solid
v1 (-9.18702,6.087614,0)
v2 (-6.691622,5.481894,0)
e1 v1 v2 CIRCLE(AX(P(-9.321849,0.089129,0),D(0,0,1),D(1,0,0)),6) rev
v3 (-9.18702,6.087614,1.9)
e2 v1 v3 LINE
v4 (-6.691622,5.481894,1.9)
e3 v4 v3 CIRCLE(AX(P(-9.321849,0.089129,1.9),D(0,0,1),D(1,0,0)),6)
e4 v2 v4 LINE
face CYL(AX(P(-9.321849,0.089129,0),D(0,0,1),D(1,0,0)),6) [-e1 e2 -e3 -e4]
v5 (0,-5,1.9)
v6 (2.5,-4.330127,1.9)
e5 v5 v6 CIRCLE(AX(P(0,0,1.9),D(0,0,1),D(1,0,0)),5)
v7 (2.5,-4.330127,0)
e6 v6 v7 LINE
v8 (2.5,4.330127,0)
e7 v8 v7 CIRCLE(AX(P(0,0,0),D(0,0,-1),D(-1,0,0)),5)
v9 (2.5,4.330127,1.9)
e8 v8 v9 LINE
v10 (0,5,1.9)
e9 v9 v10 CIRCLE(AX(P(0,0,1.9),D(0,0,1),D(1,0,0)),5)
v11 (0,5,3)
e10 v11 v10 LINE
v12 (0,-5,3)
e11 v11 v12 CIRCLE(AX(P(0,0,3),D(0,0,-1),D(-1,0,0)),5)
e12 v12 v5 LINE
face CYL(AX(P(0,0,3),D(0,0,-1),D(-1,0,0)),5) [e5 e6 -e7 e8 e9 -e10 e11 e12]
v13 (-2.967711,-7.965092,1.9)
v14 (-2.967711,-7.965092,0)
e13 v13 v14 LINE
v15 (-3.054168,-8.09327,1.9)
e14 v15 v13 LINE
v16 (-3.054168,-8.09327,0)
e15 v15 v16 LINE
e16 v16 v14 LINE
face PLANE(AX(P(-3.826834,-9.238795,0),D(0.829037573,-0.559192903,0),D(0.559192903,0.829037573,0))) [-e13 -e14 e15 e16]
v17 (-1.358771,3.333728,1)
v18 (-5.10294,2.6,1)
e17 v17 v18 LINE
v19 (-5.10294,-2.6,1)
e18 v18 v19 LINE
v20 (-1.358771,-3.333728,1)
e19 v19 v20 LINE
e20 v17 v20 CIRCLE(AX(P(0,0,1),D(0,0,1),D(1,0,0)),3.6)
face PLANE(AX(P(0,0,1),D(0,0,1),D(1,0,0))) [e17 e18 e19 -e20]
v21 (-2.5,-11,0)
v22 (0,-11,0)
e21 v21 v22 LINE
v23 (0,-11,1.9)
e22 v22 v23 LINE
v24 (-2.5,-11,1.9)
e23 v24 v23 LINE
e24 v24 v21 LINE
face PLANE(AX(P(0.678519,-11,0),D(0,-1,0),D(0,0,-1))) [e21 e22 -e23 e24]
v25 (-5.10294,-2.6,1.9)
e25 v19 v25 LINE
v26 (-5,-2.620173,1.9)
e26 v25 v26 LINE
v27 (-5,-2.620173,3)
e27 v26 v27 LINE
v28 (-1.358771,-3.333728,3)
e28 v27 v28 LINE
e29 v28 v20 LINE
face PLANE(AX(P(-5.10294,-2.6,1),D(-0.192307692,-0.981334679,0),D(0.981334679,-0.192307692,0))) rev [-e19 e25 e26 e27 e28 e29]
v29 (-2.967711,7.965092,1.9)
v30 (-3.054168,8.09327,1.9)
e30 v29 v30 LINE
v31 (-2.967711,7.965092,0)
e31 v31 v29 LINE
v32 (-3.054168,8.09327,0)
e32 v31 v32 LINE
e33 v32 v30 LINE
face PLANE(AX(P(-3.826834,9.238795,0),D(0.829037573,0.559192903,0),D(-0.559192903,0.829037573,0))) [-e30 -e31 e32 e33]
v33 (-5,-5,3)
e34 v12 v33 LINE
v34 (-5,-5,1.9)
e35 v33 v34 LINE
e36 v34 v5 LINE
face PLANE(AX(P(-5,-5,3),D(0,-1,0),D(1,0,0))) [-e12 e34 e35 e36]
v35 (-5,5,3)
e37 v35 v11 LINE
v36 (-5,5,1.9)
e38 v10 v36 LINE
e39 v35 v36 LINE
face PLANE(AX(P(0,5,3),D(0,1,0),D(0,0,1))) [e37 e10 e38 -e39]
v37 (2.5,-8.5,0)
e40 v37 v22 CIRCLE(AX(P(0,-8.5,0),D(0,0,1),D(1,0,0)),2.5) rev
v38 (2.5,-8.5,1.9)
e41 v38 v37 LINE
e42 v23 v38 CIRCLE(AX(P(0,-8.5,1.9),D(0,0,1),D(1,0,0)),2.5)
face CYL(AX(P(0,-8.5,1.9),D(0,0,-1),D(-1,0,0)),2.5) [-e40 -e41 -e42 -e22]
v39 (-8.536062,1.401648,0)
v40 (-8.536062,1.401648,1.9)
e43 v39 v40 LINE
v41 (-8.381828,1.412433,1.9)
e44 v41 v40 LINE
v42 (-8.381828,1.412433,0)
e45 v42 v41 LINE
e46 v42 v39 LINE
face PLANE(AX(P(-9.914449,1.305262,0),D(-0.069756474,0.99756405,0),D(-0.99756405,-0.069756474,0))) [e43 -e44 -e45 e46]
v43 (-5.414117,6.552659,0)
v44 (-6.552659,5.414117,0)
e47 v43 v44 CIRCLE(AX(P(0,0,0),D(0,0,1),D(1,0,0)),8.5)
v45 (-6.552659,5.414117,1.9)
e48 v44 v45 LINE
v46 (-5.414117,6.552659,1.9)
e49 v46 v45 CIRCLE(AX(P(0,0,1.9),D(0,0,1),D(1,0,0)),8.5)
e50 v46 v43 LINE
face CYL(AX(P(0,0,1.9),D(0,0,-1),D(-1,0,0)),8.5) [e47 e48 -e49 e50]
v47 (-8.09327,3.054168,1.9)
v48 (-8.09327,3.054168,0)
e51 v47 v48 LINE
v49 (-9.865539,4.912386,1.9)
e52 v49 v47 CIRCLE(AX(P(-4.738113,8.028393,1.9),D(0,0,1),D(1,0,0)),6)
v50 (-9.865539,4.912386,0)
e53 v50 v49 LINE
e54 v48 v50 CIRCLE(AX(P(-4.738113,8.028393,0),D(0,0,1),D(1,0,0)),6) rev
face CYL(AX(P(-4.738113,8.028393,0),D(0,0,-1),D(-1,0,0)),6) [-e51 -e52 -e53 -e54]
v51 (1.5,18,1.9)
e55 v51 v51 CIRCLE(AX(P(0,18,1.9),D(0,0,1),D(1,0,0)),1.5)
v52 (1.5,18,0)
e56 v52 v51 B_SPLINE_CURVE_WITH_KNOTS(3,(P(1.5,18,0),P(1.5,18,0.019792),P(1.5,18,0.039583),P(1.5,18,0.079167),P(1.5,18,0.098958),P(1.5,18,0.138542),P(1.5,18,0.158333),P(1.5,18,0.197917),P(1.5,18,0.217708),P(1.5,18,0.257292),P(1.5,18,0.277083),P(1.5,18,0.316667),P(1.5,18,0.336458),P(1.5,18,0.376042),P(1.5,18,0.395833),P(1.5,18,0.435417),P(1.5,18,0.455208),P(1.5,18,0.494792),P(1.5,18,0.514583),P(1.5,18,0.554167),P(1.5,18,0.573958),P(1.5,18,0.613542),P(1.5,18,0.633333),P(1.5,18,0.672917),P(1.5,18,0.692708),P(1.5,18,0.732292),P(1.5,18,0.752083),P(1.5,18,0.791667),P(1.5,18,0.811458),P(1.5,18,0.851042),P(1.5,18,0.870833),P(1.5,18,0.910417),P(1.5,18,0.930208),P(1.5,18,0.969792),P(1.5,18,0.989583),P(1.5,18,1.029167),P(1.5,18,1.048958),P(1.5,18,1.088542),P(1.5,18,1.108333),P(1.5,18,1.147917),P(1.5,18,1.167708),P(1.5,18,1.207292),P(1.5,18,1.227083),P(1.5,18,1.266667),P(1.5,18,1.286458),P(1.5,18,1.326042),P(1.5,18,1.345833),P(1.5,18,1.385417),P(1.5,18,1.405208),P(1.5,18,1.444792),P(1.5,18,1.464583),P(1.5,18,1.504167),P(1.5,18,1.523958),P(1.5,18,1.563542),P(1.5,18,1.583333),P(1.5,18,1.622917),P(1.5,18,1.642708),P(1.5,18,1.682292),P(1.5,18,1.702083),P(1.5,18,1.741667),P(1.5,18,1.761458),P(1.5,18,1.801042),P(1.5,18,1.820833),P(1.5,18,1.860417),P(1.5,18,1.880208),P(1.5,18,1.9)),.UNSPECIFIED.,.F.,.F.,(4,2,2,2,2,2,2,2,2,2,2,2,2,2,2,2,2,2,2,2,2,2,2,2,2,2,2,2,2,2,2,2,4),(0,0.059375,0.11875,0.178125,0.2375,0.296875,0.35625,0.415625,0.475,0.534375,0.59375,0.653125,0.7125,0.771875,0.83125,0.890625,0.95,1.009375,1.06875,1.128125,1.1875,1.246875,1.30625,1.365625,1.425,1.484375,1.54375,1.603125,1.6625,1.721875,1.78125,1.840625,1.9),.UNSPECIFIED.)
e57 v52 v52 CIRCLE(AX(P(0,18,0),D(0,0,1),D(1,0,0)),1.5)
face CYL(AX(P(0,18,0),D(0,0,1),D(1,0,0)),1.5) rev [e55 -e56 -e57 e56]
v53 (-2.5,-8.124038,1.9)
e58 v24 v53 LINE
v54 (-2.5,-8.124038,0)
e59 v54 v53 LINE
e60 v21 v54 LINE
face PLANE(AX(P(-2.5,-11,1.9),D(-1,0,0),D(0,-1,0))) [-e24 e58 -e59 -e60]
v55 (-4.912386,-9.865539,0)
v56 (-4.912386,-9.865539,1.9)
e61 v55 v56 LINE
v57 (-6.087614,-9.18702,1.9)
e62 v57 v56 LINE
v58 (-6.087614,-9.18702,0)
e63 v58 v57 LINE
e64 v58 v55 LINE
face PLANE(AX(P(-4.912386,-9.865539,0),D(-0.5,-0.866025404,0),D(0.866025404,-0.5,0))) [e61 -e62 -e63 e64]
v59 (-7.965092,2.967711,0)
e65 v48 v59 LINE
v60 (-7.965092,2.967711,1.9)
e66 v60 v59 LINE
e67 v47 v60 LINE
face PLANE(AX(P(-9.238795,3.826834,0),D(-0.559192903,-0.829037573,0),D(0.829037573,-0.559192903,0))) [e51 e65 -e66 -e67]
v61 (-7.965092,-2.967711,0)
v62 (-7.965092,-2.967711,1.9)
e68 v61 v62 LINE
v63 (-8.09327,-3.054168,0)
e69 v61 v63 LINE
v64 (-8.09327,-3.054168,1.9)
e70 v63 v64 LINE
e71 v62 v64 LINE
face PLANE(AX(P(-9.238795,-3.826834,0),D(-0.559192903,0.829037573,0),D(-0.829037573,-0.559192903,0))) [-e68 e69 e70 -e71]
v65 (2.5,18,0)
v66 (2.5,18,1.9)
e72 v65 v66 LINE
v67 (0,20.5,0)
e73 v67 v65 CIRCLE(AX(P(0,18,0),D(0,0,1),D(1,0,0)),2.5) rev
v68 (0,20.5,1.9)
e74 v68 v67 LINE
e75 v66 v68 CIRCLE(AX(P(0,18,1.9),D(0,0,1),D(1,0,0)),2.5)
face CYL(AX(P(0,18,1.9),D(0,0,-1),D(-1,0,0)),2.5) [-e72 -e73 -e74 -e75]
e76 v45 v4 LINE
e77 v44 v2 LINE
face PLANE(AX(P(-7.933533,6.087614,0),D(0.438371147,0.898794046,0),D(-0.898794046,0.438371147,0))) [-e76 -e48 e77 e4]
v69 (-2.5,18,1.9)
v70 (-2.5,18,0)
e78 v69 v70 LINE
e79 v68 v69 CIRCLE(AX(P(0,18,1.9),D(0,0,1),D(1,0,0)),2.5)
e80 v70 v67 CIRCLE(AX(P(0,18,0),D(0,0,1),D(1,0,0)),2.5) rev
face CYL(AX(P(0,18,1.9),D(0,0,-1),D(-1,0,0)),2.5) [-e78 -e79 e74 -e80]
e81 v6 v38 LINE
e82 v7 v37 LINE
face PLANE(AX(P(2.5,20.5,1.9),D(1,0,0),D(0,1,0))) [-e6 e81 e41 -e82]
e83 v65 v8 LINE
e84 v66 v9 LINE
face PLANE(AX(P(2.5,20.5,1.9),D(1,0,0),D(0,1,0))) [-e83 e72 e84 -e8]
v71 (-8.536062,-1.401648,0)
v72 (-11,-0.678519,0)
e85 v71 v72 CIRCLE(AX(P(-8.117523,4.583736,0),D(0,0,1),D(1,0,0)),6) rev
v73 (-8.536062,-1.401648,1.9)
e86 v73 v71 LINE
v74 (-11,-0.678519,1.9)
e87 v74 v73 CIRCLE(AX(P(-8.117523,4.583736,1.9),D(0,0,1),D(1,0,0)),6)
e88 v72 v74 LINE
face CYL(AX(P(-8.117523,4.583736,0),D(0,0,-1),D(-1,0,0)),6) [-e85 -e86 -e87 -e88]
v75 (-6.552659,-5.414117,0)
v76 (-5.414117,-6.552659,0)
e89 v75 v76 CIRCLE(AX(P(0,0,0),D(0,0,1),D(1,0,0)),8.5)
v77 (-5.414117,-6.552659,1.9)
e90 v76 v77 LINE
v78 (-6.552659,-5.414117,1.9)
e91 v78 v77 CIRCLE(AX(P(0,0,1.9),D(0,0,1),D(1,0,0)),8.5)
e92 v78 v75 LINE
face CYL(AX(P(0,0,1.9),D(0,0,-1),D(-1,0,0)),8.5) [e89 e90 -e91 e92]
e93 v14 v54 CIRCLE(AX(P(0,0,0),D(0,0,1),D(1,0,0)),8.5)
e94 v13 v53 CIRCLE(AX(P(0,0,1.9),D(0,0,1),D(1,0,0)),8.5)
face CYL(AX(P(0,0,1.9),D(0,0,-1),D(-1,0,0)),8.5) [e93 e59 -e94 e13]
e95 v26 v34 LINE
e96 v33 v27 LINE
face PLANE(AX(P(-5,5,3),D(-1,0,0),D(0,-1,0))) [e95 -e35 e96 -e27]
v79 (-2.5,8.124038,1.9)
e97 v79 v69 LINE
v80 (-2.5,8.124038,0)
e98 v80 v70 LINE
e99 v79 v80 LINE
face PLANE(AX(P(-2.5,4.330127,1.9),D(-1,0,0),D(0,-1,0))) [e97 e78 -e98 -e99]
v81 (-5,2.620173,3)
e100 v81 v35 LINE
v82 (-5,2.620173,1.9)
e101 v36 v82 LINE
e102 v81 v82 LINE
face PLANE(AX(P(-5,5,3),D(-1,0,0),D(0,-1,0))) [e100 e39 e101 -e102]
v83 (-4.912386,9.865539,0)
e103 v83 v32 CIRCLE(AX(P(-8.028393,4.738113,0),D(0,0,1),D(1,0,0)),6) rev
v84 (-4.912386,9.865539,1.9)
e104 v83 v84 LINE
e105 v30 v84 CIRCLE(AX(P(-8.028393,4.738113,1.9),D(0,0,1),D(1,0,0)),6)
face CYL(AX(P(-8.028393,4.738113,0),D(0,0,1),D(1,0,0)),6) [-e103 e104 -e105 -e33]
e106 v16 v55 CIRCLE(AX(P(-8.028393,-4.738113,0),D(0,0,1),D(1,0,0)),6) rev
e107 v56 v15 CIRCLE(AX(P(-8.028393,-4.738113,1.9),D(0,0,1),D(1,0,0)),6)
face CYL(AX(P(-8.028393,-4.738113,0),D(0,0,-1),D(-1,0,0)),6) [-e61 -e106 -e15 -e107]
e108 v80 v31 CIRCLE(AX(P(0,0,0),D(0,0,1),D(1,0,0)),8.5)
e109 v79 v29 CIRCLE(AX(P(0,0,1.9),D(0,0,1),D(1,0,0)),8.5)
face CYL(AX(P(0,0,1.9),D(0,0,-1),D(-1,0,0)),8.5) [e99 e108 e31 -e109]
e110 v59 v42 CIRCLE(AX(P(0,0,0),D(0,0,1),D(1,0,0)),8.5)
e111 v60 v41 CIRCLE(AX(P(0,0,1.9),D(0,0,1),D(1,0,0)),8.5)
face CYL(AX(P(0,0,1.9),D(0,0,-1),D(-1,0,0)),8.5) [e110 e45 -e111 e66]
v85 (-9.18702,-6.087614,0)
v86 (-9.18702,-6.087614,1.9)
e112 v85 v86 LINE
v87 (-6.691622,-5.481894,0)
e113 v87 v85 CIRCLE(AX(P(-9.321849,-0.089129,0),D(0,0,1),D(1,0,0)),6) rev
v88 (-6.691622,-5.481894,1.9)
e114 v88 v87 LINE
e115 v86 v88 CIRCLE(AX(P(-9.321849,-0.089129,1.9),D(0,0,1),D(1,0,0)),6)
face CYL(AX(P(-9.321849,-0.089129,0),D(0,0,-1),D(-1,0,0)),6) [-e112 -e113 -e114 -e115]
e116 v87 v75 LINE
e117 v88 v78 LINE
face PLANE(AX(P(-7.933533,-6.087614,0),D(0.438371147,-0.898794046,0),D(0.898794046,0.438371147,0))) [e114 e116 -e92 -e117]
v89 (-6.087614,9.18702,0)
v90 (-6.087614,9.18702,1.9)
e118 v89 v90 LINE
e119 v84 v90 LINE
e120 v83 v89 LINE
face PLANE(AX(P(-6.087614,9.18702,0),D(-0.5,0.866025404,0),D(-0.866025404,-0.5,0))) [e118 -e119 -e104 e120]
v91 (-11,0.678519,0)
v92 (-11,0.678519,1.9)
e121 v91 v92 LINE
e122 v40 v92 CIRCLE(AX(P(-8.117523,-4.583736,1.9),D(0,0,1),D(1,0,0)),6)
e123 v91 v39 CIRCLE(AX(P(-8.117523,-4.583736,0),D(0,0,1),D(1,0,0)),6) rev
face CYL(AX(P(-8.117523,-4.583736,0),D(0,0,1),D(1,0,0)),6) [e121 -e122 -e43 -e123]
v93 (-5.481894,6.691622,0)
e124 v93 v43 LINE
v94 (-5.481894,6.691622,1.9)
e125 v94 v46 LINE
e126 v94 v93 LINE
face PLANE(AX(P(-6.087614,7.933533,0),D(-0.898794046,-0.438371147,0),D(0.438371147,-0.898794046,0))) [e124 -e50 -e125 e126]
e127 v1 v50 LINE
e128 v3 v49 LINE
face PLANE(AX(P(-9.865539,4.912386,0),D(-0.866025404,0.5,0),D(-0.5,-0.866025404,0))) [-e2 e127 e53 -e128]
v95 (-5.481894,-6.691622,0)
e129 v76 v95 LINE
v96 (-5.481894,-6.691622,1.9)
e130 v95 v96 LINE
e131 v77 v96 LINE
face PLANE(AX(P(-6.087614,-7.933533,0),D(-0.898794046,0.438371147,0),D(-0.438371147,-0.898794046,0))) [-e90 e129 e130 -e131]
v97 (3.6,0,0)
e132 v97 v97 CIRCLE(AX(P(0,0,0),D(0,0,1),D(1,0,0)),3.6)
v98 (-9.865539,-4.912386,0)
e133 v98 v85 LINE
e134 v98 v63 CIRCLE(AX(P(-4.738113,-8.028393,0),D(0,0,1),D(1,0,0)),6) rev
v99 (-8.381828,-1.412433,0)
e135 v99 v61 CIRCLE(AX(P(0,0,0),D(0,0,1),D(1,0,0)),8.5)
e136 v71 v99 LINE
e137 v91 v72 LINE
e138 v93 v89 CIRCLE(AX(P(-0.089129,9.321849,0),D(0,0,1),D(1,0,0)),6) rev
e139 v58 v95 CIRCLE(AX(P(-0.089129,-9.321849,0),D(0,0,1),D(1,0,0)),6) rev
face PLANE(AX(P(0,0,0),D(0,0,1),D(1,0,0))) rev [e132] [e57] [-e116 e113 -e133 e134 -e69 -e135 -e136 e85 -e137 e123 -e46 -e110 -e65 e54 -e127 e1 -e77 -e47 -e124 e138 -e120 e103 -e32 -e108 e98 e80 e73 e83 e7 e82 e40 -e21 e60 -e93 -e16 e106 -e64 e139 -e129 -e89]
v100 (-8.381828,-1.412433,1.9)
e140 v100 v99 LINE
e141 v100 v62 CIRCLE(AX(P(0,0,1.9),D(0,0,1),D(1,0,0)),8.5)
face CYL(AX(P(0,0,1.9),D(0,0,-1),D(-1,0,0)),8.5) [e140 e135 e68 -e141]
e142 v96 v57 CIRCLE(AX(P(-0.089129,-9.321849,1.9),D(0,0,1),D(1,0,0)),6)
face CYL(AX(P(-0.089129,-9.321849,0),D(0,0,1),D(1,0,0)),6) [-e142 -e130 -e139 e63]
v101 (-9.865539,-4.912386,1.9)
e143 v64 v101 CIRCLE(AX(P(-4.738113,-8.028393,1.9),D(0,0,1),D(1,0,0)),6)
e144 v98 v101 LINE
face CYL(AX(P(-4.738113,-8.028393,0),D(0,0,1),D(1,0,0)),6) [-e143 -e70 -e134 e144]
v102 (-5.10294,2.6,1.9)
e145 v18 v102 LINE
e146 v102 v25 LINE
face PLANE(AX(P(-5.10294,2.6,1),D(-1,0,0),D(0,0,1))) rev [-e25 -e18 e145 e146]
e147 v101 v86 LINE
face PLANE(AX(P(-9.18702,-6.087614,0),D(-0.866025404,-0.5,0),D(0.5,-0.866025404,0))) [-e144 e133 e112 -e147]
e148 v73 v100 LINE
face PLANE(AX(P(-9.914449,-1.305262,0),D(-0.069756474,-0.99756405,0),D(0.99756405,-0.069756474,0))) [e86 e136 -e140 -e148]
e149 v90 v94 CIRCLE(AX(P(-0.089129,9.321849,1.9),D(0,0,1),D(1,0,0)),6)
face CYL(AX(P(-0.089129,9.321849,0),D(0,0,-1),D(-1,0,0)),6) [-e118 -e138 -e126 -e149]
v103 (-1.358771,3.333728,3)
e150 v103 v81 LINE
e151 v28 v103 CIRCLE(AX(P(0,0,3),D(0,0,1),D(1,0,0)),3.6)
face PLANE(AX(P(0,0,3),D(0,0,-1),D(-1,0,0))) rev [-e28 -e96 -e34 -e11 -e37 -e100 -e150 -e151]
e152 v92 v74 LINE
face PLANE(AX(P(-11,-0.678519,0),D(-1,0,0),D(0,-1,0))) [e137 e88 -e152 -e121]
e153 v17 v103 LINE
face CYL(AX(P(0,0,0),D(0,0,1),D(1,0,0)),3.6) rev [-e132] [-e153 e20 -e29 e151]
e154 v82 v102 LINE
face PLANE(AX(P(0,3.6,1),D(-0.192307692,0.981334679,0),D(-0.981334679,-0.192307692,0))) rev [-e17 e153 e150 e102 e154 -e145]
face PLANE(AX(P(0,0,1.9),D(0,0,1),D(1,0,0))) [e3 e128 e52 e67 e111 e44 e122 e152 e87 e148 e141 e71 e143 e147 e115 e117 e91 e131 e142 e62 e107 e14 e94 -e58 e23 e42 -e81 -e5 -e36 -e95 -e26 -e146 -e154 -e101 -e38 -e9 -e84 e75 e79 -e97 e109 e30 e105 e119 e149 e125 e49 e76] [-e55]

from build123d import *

# Parameters (mm, degrees)
SKETCH1_R           = 8.5
BOSS_EXTRUDE1_DEPTH = 1.9
BOSS_EXTRUDE2_DEPTH = 1.9
CIRPATTERN2_COUNT   = 12
FILLET5_R           = 6
FILLET6_R           = 6
BOSS_EXTRUDE3_DEPTH = 1.9
SKETCH6_W           = 11.017873235
SKETCH6_H           = 24.192230011
CUT_EXTRUDE2_DEPTH  = 24.342236397
SKETCH8_R           = 5
BOSS_EXTRUDE4_DEPTH = 3
SKETCH14_W          = 5
SKETCH14_H          = 10
BOSS_EXTRUDE8_DEPTH = 3
SKETCH17_R          = 1.5
CUT_EXTRUDE10_DEPTH = 24.342236397
FILLET9_R           = 2.5
FILLET10_R          = 2.5
CUT_EXTRUDE11_DEPTH = 2
SKETCH20_R          = 3.6
CUT_EXTRUDE12_DEPTH = 24.457408211


# Some blends are built 0.0001 mm under size
with BuildPart() as part:
    # Sketch1 → Boss-Extrude1 (new body)
    with BuildSketch(Plane.XY):
        with Locations(Location((0, 0, 0), (0, 0, 180))):
            Circle(SKETCH1_R)
    extrude(amount=BOSS_EXTRUDE1_DEPTH)

    # Sketch3 → Boss-Extrude2 (add)
    with BuildSketch(Plane.XY.offset(1.9)):
        Polygon((-1.305261922, 9.914448614), (-1.509060022, 7), (1.509060022, 7), (1.305261922, 9.914448614), (0.678518537, 11), (-0.678518537, 11), align=None)
    boss_extrude2 = extrude(amount=-BOSS_EXTRUDE2_DEPTH)

    # CirPattern2: Boss-Extrude2 ×12 about axis
    cirpattern2_axis = Axis((0, 0, 0), (0, 0, 1))
    for i in range(1, CIRPATTERN2_COUNT):
        add(boss_extrude2.rotate(cirpattern2_axis, i * 360 / CIRPATTERN2_COUNT))

    # Fillet5
    # the kernel refuses this fillet: 6 mm, written as the material it takes off along each edge
    with BuildSketch(Plane(origin=(9.238795325, 3.826834324, 5.354382408), x_dir=(0.49999999999981276, 0.8660254037845467, 0), z_dir=(0, 0, -1)), Plane(origin=(1.305261922, 9.914448614, 5.354382408), x_dir=(-0.5000000000001841, 0.8660254037843323, 0), z_dir=(0, 0, -1)), Plane(origin=(-7.933533403, 6.08761429, 5.354382408), x_dir=(-1, 0, 0), z_dir=(0, 0, -1)), Plane(origin=(-9.914448614, 1.305261922, 5.354382408), x_dir=(-0.8660254037843321, -0.5000000000001844, 0), z_dir=(0, 0, -1)), Plane(origin=(-9.238795325, -3.826834324, 5.354382408), x_dir=(-0.49999999999981826, -0.8660254037845436, 0), z_dir=(0, 0, -1)), Plane(origin=(-6.08761429, -7.933533403, 5.354382408), x_dir=(0, -1, 0), z_dir=(0, 0, -1)), Plane(origin=(3.826834324, -9.238795325, 5.354382408), x_dir=(0.8660254037845474, -0.49999999999981154, 0), z_dir=(0, 0, -1)), Plane(origin=(7.933533403, -6.08761429, 5.354382408), x_dir=(1, 0, 0), z_dir=(0, 0, -1)), Plane(origin=(9.914448614, -1.305261922, 5.354382408), x_dir=(0.866025403784333, 0.500000000000183, 0), z_dir=(0, 0, -1))) as fillet5_piece_1:
        with BuildLine():
            CenterArc((1.388315544, -5.998484909), FILLET5_R, 91.287628333, 24.712371667)
            Line((-1.241911337, -0.605720631), (-1.294515874, -0.497865346))
            Line((-1.294515874, -0.497865346), (-0.052604538, 0.107855286))
            Line((-0.052604538, 0.107855286), (0, 0.12))
            ThreePointArc((0, 0.12), (0.626743385, 0.12), (1.250790195, 0.119969698))
            Line((1.250790195, 0.119969698), (1.25348677, 0))
        make_face()
    extrude(amount=8.808764816, mode=Mode.SUBTRACT)
    with BuildSketch(Plane(origin=(6.08761429, 7.933533403, 5.354382408), x_dir=(-0.4383711467890806, -0.8987940462991654, 0), z_dir=(0, 0, -1)), Plane(origin=(-3.826834324, 9.238795325, 5.354382408), x_dir=(0.5591929034707432, -0.8290375725550441, 0), z_dir=(0, 0, -1)), Plane(origin=(-1.305261922, -9.914448614, 5.354382408), x_dir=(-0.06975647374412203, 0.9975640502598244, 0), z_dir=(0, 0, -1))) as fillet5_piece_2:
        with BuildLine():
            CenterArc((1.381752963, 6), FILLET5_R, 245.287628333, 24.712371667)
            Line((-1.126626446, 0.549492433), (-1.176794034, 0.440482282))
            ThreePointArc((-1.176794034, 0.440482282), (-0.615917761, 0.166890931), (-0.052604538, -0.107855286))
            Line((-0.052604538, -0.107855286), (0, -0.12))
            Line((0, -0.12), (1.381752963, -0.12))
            Line((1.381752963, -0.12), (1.381752963, 0))
        make_face()
    extrude(amount=8.808764816, mode=Mode.SUBTRACT)

    # Fillet6
    # the kernel refuses this fillet: 6 mm, written as the material it takes off along each edge
    with BuildSketch(Plane(origin=(7.933533403, 6.08761429, 5.354382408), x_dir=(-0.8987940462991681, -0.4383711467890751, 0), z_dir=(0, 0, -1)), Plane(origin=(3.826834324, 9.238795325, 5.354382408), x_dir=(-0.5591929034707512, -0.8290375725550386, 0), z_dir=(0, 0, -1)), Plane(origin=(-1.305261922, 9.914448614, 5.354382408), x_dir=(-0.06975647374412959, -0.9975640502598239, 0), z_dir=(0, 0, -1)), Plane(origin=(-6.08761429, 7.933533403, 5.354382408), x_dir=(0.43837114678907496, -0.8987940462991681, 0), z_dir=(0, 0, -1)), Plane(origin=(-9.238795325, 3.826834324, 5.354382408), x_dir=(0.8290375725550395, -0.5591929034707501, 0), z_dir=(0, 0, -1)), Plane(origin=(-9.914448614, -1.305261922, 5.354382408), x_dir=(0.9975640502598241, -0.0697564737441288, 0), z_dir=(0, 0, -1)), Plane(origin=(-7.933533403, -6.08761429, 5.354382408), x_dir=(0.8987940462991686, 0.4383711467890744, 0), z_dir=(0, 0, -1)), Plane(origin=(-3.826834324, -9.238795325, 5.354382408), x_dir=(0.5591929034707488, 0.8290375725550403, 0), z_dir=(0, 0, -1)), Plane(origin=(1.305261922, -9.914448614, 5.354382408), x_dir=(0.06975647374412966, 0.9975640502598239, 0), z_dir=(0, 0, -1)), Plane(origin=(6.08761429, -7.933533403, 5.354382408), x_dir=(-0.4383711467890749, 0.8987940462991683, 0), z_dir=(0, 0, -1)), Plane(origin=(9.238795325, -3.826834324, 5.354382408), x_dir=(-0.8290375725550393, 0.5591929034707505, 0), z_dir=(0, 0, -1)), Plane(origin=(9.914448614, 1.305261922, 5.354382408), x_dir=(-0.9975640502598239, 0.06975647374412894, 0), z_dir=(0, 0, -1))) as fillet6_piece_1:
        with BuildLine():
            CenterArc((1.381752963, -6), FILLET6_R, 90, 24.712371667)
            Line((-1.126626446, -0.549492433), (-1.176794034, -0.440482282))
            ThreePointArc((-1.176794034, -0.440482282), (-0.615917761, -0.166890931), (-0.052604538, 0.107855286))
            Line((-0.052604538, 0.107855286), (0, 0.12))
            Line((0, 0.12), (1.381752963, 0.12))
            Line((1.381752963, 0.12), (1.381752963, 0))
        make_face()
    extrude(amount=8.808764816, mode=Mode.SUBTRACT)

    # Sketch4 → Boss-Extrude3 (add)
    with BuildSketch(Plane(origin=(0, 0, 0), x_dir=(-1, 0, 0), z_dir=(0, 0, -1))):
        with BuildLine():
            Line((-2.5, 20.5), (-2.5, 4.330127019))
            ThreePointArc((-2.5, 4.330127019), (-5, 0), (-2.5, -4.330127019))
            Line((-2.5, -4.330127019), (-2.5, -11))
            Line((-2.5, -11), (2.5, -11))
            Line((2.5, -11), (2.5, -4.330127019))
            ThreePointArc((2.5, -4.330127019), (5, 0), (2.5, 4.330127019))
            Line((2.5, 4.330127019), (2.5, 20.5))
            Line((2.5, 20.5), (-2.5, 20.5))
        make_face()
    extrude(amount=-BOSS_EXTRUDE3_DEPTH)

    # Sketch6 → Cut-Extrude2 (cut, through all)
    with BuildSketch(Plane(origin=(0, 0, 0), x_dir=(-1, 0, 0), z_dir=(0, 0, -1))):
        with Locations((-8.008936618, 1.096115006)):
            Rectangle(SKETCH6_W, SKETCH6_H)
    extrude(amount=-CUT_EXTRUDE2_DEPTH, mode=Mode.SUBTRACT)

    # Sketch8 → Boss-Extrude4 (add)
    with BuildSketch(Plane(origin=(0, 0, 0), x_dir=(-1, 0, 0), z_dir=(0, 0, -1))):
        Circle(SKETCH8_R)
    extrude(amount=-BOSS_EXTRUDE4_DEPTH)

    # Sketch14 → Boss-Extrude8 (add)
    with BuildSketch(Plane(origin=(0, 0, 0), x_dir=(-1, 0, 0), z_dir=(0, 0, -1))):
        with Locations((2.5, 0)):
            Rectangle(SKETCH14_W, SKETCH14_H)
    extrude(amount=-BOSS_EXTRUDE8_DEPTH)

    # Sketch17 → Cut-Extrude10 (cut, through all)
    with BuildSketch(Plane.XY.offset(1.9)):
        with Locations((0, 18)):
            Circle(SKETCH17_R)
    extrude(amount=-CUT_EXTRUDE10_DEPTH, mode=Mode.SUBTRACT)

    # Fillet9
    fillet9_edges = [part.edges().sort_by_distance(p)[0] for p in [
        (-2.5, 20.5, 0.95),
        (2.5, 20.5, 0.95),
    ]]
    fillet(fillet9_edges, radius=FILLET9_R - 0.0001)  # a hair under: the kernel refuses the full size

    # Fillet10
    fillet10_edges = [part.edges().sort_by_distance(p)[0] for p in [
        (2.5, -11, 0.95),
    ]]
    fillet(fillet10_edges, radius=FILLET10_R)

    # Sketch19 → Cut-Extrude11 (cut)
    with BuildSketch(Plane.XY.offset(3)):
        Polygon((0, 3.6), (-5.102940329, 2.6), (-5.102940329, -2.6), (0, -3.6), align=None)
    extrude(amount=-CUT_EXTRUDE11_DEPTH, mode=Mode.SUBTRACT)

    # Sketch20 → Cut-Extrude12 (cut, through all)
    with BuildSketch(Plane.XY.offset(3)):
        Circle(SKETCH20_R)
    extrude(amount=-CUT_EXTRUDE12_DEPTH, mode=Mode.SUBTRACT)


solid = part.part
